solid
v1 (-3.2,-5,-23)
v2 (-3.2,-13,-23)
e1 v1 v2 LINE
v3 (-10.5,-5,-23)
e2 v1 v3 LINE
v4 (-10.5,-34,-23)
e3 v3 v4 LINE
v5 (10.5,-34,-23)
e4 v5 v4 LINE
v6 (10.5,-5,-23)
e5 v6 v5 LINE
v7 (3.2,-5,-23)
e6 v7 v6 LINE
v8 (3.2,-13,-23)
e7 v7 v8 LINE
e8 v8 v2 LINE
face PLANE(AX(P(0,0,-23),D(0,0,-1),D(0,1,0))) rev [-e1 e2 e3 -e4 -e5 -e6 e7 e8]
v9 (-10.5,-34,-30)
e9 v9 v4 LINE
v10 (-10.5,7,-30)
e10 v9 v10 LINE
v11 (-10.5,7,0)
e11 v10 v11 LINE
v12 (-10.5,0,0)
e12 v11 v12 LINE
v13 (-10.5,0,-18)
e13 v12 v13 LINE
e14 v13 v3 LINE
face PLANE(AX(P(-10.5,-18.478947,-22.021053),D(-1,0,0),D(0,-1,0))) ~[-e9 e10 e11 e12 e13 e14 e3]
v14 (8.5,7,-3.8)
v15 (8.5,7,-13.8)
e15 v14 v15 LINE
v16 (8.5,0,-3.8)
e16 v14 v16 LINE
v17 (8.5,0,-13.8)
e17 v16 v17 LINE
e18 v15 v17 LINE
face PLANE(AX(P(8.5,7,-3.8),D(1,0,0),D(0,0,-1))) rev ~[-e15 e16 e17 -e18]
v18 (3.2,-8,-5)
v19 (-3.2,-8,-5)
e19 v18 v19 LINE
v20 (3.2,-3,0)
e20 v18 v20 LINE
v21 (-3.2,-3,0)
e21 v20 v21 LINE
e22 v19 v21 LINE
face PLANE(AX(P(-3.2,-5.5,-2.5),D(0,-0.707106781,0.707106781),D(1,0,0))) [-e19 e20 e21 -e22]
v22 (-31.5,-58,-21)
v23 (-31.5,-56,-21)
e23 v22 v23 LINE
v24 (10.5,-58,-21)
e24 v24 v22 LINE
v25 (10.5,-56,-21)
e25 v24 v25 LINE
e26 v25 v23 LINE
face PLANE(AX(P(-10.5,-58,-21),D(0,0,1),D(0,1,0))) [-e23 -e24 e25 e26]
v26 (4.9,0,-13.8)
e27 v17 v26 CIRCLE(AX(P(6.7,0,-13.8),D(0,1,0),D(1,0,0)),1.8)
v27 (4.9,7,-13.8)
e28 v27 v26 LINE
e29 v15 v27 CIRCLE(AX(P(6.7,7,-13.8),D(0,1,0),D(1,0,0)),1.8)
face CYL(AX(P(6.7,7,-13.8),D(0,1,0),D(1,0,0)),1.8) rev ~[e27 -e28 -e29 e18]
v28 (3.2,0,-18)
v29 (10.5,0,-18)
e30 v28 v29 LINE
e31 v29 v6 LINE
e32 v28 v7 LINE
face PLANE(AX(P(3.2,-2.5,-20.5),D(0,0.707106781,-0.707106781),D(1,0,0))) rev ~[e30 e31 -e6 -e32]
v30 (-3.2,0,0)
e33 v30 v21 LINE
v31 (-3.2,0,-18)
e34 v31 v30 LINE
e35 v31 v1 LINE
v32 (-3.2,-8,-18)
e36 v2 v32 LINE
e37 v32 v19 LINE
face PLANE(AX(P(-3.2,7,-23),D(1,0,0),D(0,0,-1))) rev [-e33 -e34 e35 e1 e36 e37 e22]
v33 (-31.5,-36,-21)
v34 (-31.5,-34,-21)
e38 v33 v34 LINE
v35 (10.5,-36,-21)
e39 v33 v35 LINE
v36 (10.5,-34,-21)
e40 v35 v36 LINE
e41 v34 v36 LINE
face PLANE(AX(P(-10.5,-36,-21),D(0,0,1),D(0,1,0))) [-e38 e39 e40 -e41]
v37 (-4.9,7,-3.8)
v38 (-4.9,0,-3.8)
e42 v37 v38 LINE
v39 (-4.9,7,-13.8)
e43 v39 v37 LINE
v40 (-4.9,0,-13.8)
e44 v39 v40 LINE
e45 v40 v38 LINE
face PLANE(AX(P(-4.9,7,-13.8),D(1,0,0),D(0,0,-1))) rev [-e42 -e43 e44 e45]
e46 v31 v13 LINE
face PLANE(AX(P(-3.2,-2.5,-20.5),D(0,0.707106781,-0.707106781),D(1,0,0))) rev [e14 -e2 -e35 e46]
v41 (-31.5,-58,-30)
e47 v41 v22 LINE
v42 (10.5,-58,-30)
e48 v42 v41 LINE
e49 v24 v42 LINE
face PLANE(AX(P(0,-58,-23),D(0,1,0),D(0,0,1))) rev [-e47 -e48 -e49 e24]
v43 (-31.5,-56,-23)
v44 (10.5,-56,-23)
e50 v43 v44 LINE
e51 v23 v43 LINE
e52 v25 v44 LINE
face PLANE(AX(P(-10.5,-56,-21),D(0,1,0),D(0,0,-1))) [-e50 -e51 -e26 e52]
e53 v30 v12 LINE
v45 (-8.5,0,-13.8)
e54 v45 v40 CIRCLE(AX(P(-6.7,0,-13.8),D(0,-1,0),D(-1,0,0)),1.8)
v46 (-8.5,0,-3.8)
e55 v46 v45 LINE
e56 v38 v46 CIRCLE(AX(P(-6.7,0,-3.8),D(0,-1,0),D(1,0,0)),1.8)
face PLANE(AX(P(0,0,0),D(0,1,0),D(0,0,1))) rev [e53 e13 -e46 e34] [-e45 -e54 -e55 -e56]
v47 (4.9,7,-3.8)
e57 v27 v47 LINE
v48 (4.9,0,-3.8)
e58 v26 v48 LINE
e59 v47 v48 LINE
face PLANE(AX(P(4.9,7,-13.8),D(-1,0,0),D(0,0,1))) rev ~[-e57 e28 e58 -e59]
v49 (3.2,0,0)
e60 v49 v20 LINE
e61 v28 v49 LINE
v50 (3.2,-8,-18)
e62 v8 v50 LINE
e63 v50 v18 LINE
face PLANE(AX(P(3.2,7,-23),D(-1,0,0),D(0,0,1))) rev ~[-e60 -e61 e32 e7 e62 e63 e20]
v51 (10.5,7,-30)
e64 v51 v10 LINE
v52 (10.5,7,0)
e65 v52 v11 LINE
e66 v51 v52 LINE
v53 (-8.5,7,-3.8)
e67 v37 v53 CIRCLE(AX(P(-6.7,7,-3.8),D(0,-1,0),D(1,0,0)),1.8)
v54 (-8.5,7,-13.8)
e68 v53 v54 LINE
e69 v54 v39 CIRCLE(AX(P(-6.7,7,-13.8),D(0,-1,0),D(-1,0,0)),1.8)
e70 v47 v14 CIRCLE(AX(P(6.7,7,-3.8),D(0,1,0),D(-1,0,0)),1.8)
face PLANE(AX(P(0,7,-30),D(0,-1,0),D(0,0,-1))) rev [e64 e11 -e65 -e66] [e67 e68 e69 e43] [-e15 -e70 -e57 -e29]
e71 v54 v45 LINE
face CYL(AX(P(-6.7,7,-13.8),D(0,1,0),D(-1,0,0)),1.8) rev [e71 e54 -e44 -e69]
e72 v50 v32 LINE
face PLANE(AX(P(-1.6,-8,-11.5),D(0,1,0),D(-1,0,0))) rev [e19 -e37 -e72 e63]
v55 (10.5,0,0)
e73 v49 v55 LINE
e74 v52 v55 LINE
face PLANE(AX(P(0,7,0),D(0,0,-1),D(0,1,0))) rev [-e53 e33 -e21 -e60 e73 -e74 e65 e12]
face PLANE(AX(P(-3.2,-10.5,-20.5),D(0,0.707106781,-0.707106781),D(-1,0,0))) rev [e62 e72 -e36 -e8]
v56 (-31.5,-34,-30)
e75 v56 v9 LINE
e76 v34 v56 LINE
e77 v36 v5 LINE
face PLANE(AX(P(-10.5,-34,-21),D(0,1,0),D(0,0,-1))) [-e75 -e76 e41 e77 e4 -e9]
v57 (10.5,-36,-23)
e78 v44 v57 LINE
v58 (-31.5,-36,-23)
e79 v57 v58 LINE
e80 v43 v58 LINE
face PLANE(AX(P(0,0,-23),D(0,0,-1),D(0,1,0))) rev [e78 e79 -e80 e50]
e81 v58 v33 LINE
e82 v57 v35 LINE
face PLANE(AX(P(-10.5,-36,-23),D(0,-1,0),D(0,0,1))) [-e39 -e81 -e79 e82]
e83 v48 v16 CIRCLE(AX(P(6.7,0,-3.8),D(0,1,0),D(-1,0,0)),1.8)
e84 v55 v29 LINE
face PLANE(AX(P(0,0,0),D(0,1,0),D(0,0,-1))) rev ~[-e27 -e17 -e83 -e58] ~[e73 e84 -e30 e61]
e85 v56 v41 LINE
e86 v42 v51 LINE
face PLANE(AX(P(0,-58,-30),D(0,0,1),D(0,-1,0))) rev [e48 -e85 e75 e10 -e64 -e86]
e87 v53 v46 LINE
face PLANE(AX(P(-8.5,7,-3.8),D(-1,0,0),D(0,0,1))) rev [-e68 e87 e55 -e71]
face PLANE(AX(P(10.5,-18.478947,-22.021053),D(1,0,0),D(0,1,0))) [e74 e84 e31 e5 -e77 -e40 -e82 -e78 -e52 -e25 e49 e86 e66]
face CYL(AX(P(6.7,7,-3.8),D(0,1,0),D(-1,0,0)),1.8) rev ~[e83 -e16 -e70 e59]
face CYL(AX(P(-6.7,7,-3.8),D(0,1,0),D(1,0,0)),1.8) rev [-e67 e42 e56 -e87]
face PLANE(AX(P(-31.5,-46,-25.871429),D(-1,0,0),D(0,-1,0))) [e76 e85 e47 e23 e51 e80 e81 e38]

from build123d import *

# Parameters (mm, degrees)
F1_DEPTH = 10.5
F3_DEPTH = 25
F2_W     = 3.2
F2_H     = 23
F4_DEPTH = 15
F5_SIZE  = 5
F8_DEPTH = 21


with BuildPart() as f1:
    # F0 (on Right) → F1 (new body)
    with BuildSketch(Plane.YZ):
        Polygon((0, 0), (0, -23), (-46.5, -23), (-51, -23), (-58, -23), (-58, -30), (7, -30), (7, 0), align=None)
    extrude(amount=F1_DEPTH)

    # F2 (on face) → F3 (cut)
    with BuildSketch(Plane(origin=(0, 7, 0), x_dir=(-1, 0, 0), z_dir=(0, 1, 0))):
        with BuildLine():
            Line((-4.9, -13.8), (-4.9, -3.8))
            ThreePointArc((-4.9, -3.8), (-6.7, -2), (-8.5, -3.8))
            Line((-8.5, -3.8), (-8.5, -13.8))
            ThreePointArc((-8.5, -13.8), (-6.7, -15.6), (-4.9, -13.8))
        make_face()
    extrude(amount=-F3_DEPTH, mode=Mode.SUBTRACT)

    # F2 (on face) → F4 (join)
    with BuildSketch(Plane(origin=(0, 7, 0), x_dir=(-1, 0, 0), z_dir=(0, 1, 0))):
        with Locations((-1.6, -11.5)):
            Rectangle(F2_W, F2_H)
    extrude(amount=-F4_DEPTH)

    # F5
    f5_edges = [f1.edges().sort_by_distance(p)[0] for p in [
        (1.6, -8, -23),
        (1.6, -8, 0),
        (6.85, 0, -23),
    ]]
    chamfer(f5_edges, length=F5_SIZE)

    # F6: F1 across face


with BuildPart() as f1_1:
    add(f1.part)
    add(f1.part.mirror(Plane(origin=(0, -14.7708333333, -20.3385416667), x_dir=(0, -1, 0), z_dir=(-1, 0, 0))))

    # F7 (on face) → F8 (join, symmetric)
    with BuildSketch(Plane(origin=(-10.5, 0, 0), x_dir=(0, -1, 0), z_dir=(-1, 0, 0))):
        Polygon((34, -30), (58, -30), (58, -21), (56, -21), (56, -23), (36, -23), (36, -21), (34, -21), align=None)
    extrude(amount=F8_DEPTH, both=True)


solid = f1_1.part
